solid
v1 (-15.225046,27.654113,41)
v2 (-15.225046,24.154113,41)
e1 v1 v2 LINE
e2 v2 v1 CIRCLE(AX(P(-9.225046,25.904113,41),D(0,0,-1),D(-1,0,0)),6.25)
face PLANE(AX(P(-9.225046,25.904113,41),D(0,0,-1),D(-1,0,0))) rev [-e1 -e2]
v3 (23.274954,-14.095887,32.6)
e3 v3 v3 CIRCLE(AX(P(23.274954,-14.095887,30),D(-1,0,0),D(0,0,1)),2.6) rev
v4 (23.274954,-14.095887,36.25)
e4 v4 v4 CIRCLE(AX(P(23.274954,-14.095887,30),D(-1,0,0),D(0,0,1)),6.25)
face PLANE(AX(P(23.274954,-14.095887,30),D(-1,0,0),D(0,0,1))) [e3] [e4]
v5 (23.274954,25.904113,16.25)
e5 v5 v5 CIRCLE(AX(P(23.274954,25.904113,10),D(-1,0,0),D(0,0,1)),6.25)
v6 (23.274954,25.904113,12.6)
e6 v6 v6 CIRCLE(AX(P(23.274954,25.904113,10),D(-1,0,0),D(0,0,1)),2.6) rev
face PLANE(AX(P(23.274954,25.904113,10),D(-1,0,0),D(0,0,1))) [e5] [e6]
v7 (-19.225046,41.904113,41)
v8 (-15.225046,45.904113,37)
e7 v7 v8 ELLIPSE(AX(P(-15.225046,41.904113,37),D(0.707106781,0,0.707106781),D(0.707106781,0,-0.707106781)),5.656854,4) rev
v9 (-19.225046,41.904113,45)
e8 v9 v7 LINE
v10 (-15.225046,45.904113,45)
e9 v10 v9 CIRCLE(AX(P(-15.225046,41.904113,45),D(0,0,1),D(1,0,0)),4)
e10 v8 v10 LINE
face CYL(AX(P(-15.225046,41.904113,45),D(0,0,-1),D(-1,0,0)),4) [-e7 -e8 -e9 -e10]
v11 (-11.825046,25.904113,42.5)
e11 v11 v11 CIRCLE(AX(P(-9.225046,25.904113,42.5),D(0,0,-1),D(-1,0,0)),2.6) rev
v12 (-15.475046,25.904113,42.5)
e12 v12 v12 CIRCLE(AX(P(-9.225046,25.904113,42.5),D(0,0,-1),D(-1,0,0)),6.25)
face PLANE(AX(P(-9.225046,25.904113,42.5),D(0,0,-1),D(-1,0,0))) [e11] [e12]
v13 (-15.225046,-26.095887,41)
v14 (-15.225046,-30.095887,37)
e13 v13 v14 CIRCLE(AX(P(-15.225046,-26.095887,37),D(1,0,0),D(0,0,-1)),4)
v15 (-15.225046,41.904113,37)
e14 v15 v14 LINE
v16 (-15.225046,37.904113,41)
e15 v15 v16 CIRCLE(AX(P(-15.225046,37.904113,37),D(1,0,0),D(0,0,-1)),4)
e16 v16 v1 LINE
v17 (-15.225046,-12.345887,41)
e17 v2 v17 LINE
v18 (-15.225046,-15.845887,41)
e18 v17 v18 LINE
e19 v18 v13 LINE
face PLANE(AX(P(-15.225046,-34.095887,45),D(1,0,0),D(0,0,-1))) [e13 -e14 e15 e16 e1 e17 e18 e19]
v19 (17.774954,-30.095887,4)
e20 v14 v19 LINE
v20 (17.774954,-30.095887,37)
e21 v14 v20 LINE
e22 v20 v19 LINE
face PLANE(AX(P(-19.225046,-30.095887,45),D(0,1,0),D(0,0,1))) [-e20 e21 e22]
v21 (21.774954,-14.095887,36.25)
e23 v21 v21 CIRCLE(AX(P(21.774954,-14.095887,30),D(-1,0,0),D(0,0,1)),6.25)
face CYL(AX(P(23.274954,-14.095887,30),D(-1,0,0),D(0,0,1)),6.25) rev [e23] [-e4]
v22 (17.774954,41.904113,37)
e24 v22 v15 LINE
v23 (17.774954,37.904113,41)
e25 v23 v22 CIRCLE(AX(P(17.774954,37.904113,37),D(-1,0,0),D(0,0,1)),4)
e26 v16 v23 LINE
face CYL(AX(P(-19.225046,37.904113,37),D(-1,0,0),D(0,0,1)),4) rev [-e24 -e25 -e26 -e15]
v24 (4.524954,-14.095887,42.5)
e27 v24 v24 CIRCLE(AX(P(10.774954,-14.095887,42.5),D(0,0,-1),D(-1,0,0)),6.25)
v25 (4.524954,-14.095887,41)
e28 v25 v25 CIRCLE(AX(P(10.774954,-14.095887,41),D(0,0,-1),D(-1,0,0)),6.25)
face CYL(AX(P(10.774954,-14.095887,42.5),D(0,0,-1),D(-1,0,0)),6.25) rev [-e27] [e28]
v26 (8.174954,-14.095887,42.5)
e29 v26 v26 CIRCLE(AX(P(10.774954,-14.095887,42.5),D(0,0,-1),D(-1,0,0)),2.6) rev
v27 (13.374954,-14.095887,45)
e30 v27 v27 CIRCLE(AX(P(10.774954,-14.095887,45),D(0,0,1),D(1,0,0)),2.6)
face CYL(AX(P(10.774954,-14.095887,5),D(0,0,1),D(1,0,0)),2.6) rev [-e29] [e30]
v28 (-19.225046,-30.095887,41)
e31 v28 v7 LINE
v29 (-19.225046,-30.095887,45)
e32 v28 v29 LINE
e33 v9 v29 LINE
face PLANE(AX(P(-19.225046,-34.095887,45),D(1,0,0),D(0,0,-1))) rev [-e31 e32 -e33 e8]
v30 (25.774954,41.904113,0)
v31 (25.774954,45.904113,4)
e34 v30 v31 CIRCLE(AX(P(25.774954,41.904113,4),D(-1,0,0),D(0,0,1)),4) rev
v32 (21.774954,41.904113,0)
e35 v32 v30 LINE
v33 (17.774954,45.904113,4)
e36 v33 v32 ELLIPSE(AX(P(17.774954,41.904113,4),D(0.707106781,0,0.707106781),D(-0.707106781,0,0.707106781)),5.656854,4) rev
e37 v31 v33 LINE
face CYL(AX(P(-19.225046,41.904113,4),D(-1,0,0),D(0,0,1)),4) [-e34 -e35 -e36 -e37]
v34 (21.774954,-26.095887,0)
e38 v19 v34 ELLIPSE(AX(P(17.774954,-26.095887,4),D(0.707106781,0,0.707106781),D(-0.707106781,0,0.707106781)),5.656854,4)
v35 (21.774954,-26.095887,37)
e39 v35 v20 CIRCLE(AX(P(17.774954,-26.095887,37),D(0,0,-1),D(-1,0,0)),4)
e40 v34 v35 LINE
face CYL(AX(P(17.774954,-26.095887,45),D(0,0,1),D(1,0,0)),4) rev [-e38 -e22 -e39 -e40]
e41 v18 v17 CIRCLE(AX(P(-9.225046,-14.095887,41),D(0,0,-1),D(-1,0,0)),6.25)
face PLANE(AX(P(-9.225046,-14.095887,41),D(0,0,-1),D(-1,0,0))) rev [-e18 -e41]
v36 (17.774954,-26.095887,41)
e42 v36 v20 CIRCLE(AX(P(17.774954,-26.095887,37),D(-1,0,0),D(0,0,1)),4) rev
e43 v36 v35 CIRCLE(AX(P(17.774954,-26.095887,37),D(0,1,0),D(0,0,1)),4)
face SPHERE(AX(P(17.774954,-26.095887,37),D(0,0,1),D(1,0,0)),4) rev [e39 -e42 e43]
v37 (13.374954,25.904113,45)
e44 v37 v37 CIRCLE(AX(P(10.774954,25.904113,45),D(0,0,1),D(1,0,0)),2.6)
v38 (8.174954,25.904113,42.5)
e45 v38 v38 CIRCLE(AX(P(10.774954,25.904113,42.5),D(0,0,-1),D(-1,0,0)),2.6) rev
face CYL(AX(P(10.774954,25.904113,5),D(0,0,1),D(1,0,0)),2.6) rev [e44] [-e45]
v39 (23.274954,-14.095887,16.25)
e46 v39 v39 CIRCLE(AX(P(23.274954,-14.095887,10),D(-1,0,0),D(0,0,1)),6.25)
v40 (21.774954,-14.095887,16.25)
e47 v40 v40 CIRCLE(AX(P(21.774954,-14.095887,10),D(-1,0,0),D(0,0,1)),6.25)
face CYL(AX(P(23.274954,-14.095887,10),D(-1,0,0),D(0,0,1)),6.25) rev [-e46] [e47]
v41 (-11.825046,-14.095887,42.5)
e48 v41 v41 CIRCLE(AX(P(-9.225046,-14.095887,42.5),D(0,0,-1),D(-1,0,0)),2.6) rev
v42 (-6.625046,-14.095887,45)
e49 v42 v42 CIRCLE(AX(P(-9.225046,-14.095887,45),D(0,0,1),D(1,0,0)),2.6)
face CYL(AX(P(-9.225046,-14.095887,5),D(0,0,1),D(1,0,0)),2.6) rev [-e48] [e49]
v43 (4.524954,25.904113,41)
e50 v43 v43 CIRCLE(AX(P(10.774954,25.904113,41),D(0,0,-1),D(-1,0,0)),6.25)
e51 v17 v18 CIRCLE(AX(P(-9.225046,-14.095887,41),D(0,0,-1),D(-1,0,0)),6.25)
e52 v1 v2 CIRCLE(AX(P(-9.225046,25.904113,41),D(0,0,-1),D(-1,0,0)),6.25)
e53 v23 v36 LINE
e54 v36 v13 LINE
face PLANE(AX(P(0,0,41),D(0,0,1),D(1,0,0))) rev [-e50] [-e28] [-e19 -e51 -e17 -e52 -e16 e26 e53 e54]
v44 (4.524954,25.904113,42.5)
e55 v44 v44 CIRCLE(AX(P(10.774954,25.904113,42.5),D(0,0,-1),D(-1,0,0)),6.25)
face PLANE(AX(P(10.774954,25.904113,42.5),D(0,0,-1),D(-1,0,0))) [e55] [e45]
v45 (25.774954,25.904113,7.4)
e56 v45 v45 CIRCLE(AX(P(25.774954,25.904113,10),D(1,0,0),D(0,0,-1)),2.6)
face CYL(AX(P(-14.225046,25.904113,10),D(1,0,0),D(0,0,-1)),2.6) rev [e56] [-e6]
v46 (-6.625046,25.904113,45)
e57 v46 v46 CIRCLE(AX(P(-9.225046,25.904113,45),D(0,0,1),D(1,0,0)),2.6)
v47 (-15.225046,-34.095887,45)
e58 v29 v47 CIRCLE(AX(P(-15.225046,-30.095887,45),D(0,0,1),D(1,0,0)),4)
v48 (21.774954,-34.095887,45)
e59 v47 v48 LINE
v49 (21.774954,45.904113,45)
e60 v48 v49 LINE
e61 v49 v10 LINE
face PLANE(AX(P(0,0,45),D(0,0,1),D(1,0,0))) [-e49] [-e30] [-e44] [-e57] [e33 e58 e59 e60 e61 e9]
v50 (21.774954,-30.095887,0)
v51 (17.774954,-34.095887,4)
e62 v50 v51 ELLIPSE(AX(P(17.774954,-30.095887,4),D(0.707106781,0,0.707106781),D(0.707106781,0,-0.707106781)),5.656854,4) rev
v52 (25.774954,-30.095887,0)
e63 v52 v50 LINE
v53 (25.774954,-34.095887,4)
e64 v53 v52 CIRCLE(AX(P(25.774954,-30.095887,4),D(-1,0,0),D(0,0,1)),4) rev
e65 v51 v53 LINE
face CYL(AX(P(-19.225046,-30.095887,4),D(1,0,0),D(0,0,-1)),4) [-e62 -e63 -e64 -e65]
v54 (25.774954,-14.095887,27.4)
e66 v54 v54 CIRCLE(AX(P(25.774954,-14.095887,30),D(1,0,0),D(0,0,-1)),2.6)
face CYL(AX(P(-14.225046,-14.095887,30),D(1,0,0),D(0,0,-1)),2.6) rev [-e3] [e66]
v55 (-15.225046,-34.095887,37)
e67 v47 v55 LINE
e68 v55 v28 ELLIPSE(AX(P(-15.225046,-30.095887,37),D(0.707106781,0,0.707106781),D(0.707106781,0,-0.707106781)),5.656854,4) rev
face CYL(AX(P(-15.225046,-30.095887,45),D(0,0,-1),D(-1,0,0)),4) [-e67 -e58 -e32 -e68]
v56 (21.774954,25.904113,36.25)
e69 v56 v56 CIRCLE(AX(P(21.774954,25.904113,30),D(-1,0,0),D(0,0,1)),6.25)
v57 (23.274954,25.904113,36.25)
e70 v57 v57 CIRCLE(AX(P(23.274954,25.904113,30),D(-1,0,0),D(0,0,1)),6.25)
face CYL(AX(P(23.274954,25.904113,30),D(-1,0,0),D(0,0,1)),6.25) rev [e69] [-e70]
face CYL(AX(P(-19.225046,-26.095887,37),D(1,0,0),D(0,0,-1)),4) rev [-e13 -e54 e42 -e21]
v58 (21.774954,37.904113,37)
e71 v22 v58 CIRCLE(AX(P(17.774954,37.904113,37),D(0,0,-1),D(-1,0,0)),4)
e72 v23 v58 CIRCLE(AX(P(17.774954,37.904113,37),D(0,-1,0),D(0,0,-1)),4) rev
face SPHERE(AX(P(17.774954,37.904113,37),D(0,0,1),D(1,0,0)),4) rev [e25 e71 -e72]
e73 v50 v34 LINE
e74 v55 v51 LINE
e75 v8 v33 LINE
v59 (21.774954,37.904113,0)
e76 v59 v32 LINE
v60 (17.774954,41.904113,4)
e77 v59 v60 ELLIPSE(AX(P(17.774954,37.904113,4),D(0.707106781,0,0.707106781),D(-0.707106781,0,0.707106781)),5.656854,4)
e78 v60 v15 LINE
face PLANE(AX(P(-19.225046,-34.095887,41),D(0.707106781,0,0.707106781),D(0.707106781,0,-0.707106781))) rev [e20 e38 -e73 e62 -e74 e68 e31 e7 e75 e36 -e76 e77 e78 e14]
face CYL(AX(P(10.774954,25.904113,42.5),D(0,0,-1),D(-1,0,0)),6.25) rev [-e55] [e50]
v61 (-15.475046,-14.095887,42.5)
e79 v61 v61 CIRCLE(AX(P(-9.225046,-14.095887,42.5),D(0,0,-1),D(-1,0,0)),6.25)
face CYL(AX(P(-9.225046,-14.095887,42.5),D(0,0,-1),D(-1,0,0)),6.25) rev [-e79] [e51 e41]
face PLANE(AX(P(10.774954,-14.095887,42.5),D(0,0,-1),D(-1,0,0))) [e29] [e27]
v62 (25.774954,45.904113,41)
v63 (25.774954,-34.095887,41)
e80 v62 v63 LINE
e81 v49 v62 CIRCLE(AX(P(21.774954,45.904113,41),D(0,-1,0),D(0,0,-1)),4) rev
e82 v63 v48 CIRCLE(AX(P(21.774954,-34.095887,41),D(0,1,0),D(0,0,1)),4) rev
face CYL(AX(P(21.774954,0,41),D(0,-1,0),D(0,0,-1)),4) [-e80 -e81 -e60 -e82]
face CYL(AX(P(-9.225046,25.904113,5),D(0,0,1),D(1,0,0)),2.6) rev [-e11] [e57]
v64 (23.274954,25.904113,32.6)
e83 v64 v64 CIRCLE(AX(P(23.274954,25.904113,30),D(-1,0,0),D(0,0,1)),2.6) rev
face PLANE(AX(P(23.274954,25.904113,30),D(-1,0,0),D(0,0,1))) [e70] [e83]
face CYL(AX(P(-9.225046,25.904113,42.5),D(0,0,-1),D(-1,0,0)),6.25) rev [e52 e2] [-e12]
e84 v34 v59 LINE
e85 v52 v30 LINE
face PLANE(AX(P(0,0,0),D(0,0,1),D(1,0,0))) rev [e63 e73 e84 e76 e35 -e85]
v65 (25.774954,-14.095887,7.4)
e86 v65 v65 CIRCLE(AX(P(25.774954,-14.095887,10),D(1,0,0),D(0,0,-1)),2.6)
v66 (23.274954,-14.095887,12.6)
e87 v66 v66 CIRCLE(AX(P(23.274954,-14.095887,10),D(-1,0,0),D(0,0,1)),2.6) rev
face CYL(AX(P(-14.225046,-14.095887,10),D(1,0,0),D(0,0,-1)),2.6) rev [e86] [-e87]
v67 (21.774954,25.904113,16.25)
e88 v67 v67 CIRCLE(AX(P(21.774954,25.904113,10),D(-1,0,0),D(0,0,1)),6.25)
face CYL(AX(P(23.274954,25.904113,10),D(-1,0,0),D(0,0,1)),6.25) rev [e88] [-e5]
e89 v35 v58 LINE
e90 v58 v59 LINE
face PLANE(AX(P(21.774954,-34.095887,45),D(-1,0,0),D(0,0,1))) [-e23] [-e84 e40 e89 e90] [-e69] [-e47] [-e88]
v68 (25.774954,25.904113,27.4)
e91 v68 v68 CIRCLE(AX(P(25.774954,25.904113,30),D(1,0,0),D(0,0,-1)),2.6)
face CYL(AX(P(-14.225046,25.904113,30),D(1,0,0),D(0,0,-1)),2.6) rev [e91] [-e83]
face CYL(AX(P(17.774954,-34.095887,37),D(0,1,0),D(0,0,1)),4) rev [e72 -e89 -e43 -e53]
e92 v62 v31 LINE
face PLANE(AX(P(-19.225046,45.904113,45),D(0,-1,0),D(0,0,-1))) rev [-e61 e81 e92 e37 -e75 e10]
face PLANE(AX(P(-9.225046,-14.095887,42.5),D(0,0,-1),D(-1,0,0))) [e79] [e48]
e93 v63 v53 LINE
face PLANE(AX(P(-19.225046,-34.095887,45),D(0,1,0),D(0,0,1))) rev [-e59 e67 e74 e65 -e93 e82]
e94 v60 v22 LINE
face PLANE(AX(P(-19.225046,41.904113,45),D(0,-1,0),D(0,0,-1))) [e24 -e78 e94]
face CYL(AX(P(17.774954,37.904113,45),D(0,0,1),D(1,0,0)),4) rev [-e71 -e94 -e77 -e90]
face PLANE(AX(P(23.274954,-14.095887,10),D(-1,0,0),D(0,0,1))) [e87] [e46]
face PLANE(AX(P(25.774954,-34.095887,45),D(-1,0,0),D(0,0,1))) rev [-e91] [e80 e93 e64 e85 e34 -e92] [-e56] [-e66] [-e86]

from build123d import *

# Parameters (mm, degrees)
SKETCH1_W           = 45
SKETCH1_H           = 80
BOSS_EXTRUDE1_DEPTH = 45
SKETCH3_R           = 2.6
CUT_EXTRUDE1_DEPTH  = 40
SHELL1_OUTLINE_R    = 6.6
SHELL1_DEPTH        = 41
SHELL1_2_OUTLINE_R  = 6.6
SHELL1_2_DEPTH      = 1
CUT_EXTRUDE2_DEPTH  = 96.338073399
SKETCH5_W           = 37
SKETCH5_H           = 72
CUT_EXTRUDE3_DEPTH  = 40
SKETCH6_R           = 2.6
CUT_EXTRUDE4_DEPTH  = 40
FILLET1_R           = 4
FILLET2_R           = 4
FILLET3_R           = 4
SKETCH8_R           = 6.25
CUT_EXTRUDE5_DEPTH  = 1.5
SKETCH7_R           = 6.25
CUT_EXTRUDE6_DEPTH  = 1.5


# Read off the part's stored shape, not the designer's step: Shell1
with BuildPart() as part:
    # Sketch1 → Boss-Extrude1 (new body)
    with BuildSketch(Plane.XY):
        with Locations((3.274953722, 5.904112676)):
            Rectangle(SKETCH1_W, SKETCH1_H)
    extrude(amount=BOSS_EXTRUDE1_DEPTH)

    # Sketch3 → Cut-Extrude1 (cut)
    with BuildSketch(Plane(origin=(0, 0, 45), x_dir=(-1, 0, 0), z_dir=(0, 0, 1))):
        with Locations(Location((-10.774953722, -25.904112676, 0), (0, 0, 180))):
            Circle(SKETCH3_R)
        with Locations(Location((-10.774953722, 14.095887324, 0), (0, 0, 180))):
            Circle(SKETCH3_R)
        with Locations(Location((9.225046278, 14.095887324, 0), (0, 0, 180))):
            Circle(SKETCH3_R)
        with Locations(Location((9.225046278, -25.904112676, 0), (0, 0, 180))):
            Circle(SKETCH3_R)
    extrude(amount=-CUT_EXTRUDE1_DEPTH, mode=Mode.SUBTRACT)

    # Shell1 outline → Shell1 (cut)
    with BuildSketch(Plane.XY):
        with BuildLine():
            Line((-15.225046278, -16.845432741), (-15.225046278, -30.095887324))
            Line((-15.225046278, -30.095887324), (21.774953722, -30.095887324))
            Line((21.774953722, -30.095887324), (21.774953722, 41.904112676))
            Line((21.774953722, 41.904112676), (-15.225046278, 41.904112676))
            Line((-15.225046278, 41.904112676), (-15.225046278, 28.653658093))
            ThreePointArc((-15.225046278, 28.653658093), (-2.625046278, 25.904112676), (-15.225046278, 23.154567259))
            Line((-15.225046278, 23.154567259), (-15.225046278, -11.346341907))
            ThreePointArc((-15.225046278, -11.346341907), (-2.625046278, -14.095887324), (-15.225046278, -16.845432741))
        make_face()
        with Locations((10.774953722, -14.095887324)):
            Circle(SHELL1_OUTLINE_R, mode=Mode.SUBTRACT)
        with Locations((10.774953722, 25.904112676)):
            Circle(SHELL1_OUTLINE_R, mode=Mode.SUBTRACT)
    extrude(amount=SHELL1_DEPTH, mode=Mode.SUBTRACT)

    # Shell1 2 outline → Shell1 2 (cut)
    with BuildSketch(Plane.XY):
        with BuildLine():
            Line((-15.225046278, -11.346341907), (-15.225046278, -16.845432741))
            ThreePointArc((-15.225046278, -16.845432741), (-2.625046278, -14.095887324), (-15.225046278, -11.346341907))
        make_face()
        with BuildLine():
            Line((-15.225046278, 28.653658093), (-15.225046278, 23.154567259))
            ThreePointArc((-15.225046278, 23.154567259), (-2.625046278, 25.904112676), (-15.225046278, 28.653658093))
        make_face()
        with Locations((10.774953722, -14.095887324)):
            Circle(SHELL1_2_OUTLINE_R)
        with Locations((10.774953722, 25.904112676)):
            Circle(SHELL1_2_OUTLINE_R)
    extrude(amount=SHELL1_2_DEPTH, mode=Mode.SUBTRACT)

    # Sketch4 → Cut-Extrude2 (cut, through all)
    with BuildSketch(Plane(origin=(0, 45.904112676, 0), x_dir=(1, 0, 0), z_dir=(0, 1, 0))):
        Polygon((-19.225046278, 0), (-19.225046278, -41), (21.774953722, 0), align=None)
    extrude(amount=-CUT_EXTRUDE2_DEPTH, mode=Mode.SUBTRACT)

    # Sketch5 → Cut-Extrude3 (cut)
    with BuildSketch(Plane(origin=(0, 0, 41), x_dir=(-1, 0, 0), z_dir=(0, 0, -1))):
        with Locations((-3.274953722, 5.904112676)):
            Rectangle(SKETCH5_W, SKETCH5_H)
    extrude(amount=CUT_EXTRUDE3_DEPTH, mode=Mode.SUBTRACT)

    # Sketch6 → Cut-Extrude4 (cut)
    with BuildSketch(Plane(origin=(25.774953722, 0, 0), x_dir=(0, 0, 1), z_dir=(1, 0, 0))):
        with Locations(Location((10, -25.904112676, 0), (0, 0, 180))):
            Circle(SKETCH6_R)
        with Locations(Location((10, 14.095887324, 0), (0, 0, 180))):
            Circle(SKETCH6_R)
        with Locations(Location((30, 14.095887324, 0), (0, 0, 180))):
            Circle(SKETCH6_R)
        with Locations(Location((30, -25.904112676, 0), (0, 0, 180))):
            Circle(SKETCH6_R)
    extrude(amount=-CUT_EXTRUDE4_DEPTH, mode=Mode.SUBTRACT)

    # Fillet1
    fillet1_edges = [part.edges().sort_by_distance(p)[0] for p in [
        (3.274953722, -30.095887324, 41),
        (21.774953722, -30.095887324, 20.5),
        (21.774953722, 41.904112676, 20.5),
        (21.774953722, 5.904112676, 41),
        (3.274953722, 41.904112676, 41),
    ]]
    fillet(fillet1_edges, radius=FILLET1_R)

    # Fillet2
    fillet2_edges = [part.edges().sort_by_distance(p)[0] for p in [
        (23.774953722, -34.095887324, 0),
        (23.774953722, 45.904112676, 0),
        (-19.225046278, -34.095887324, 43),
        (-19.225046278, 45.904112676, 43),
    ]]
    fillet(fillet2_edges, radius=FILLET2_R)

    # Fillet3
    fillet3_edges = [part.edges().sort_by_distance(p)[0] for p in [
        (25.774953722, 5.904112676, 45),
    ]]
    fillet(fillet3_edges, radius=FILLET3_R)

    # Sketch8 → Cut-Extrude5 (cut)
    with BuildSketch(Plane(origin=(0, 0, 41), x_dir=(-1, 0, 0), z_dir=(0, 0, -1))):
        with Locations((-10.774953722, -14.095887324)):
            Circle(SKETCH8_R)
        with Locations((-10.774953722, 25.904112676)):
            Circle(SKETCH8_R)
        with Locations((9.225046278, 25.904112676)):
            Circle(SKETCH8_R)
        with Locations((9.225046278, -14.095887324)):
            Circle(SKETCH8_R)
    extrude(amount=-CUT_EXTRUDE5_DEPTH, mode=Mode.SUBTRACT)

    # Sketch7 → Cut-Extrude6 (cut)
    with BuildSketch(Plane.ZY.offset(-21.774953722)):
        with Locations((10, 25.904112676)):
            Circle(SKETCH7_R)
        with Locations((30, 25.904112676)):
            Circle(SKETCH7_R)
        with Locations((30, -14.095887324)):
            Circle(SKETCH7_R)
        with Locations((10, -14.095887324)):
            Circle(SKETCH7_R)
    extrude(amount=-CUT_EXTRUDE6_DEPTH, mode=Mode.SUBTRACT)


solid = part.part
